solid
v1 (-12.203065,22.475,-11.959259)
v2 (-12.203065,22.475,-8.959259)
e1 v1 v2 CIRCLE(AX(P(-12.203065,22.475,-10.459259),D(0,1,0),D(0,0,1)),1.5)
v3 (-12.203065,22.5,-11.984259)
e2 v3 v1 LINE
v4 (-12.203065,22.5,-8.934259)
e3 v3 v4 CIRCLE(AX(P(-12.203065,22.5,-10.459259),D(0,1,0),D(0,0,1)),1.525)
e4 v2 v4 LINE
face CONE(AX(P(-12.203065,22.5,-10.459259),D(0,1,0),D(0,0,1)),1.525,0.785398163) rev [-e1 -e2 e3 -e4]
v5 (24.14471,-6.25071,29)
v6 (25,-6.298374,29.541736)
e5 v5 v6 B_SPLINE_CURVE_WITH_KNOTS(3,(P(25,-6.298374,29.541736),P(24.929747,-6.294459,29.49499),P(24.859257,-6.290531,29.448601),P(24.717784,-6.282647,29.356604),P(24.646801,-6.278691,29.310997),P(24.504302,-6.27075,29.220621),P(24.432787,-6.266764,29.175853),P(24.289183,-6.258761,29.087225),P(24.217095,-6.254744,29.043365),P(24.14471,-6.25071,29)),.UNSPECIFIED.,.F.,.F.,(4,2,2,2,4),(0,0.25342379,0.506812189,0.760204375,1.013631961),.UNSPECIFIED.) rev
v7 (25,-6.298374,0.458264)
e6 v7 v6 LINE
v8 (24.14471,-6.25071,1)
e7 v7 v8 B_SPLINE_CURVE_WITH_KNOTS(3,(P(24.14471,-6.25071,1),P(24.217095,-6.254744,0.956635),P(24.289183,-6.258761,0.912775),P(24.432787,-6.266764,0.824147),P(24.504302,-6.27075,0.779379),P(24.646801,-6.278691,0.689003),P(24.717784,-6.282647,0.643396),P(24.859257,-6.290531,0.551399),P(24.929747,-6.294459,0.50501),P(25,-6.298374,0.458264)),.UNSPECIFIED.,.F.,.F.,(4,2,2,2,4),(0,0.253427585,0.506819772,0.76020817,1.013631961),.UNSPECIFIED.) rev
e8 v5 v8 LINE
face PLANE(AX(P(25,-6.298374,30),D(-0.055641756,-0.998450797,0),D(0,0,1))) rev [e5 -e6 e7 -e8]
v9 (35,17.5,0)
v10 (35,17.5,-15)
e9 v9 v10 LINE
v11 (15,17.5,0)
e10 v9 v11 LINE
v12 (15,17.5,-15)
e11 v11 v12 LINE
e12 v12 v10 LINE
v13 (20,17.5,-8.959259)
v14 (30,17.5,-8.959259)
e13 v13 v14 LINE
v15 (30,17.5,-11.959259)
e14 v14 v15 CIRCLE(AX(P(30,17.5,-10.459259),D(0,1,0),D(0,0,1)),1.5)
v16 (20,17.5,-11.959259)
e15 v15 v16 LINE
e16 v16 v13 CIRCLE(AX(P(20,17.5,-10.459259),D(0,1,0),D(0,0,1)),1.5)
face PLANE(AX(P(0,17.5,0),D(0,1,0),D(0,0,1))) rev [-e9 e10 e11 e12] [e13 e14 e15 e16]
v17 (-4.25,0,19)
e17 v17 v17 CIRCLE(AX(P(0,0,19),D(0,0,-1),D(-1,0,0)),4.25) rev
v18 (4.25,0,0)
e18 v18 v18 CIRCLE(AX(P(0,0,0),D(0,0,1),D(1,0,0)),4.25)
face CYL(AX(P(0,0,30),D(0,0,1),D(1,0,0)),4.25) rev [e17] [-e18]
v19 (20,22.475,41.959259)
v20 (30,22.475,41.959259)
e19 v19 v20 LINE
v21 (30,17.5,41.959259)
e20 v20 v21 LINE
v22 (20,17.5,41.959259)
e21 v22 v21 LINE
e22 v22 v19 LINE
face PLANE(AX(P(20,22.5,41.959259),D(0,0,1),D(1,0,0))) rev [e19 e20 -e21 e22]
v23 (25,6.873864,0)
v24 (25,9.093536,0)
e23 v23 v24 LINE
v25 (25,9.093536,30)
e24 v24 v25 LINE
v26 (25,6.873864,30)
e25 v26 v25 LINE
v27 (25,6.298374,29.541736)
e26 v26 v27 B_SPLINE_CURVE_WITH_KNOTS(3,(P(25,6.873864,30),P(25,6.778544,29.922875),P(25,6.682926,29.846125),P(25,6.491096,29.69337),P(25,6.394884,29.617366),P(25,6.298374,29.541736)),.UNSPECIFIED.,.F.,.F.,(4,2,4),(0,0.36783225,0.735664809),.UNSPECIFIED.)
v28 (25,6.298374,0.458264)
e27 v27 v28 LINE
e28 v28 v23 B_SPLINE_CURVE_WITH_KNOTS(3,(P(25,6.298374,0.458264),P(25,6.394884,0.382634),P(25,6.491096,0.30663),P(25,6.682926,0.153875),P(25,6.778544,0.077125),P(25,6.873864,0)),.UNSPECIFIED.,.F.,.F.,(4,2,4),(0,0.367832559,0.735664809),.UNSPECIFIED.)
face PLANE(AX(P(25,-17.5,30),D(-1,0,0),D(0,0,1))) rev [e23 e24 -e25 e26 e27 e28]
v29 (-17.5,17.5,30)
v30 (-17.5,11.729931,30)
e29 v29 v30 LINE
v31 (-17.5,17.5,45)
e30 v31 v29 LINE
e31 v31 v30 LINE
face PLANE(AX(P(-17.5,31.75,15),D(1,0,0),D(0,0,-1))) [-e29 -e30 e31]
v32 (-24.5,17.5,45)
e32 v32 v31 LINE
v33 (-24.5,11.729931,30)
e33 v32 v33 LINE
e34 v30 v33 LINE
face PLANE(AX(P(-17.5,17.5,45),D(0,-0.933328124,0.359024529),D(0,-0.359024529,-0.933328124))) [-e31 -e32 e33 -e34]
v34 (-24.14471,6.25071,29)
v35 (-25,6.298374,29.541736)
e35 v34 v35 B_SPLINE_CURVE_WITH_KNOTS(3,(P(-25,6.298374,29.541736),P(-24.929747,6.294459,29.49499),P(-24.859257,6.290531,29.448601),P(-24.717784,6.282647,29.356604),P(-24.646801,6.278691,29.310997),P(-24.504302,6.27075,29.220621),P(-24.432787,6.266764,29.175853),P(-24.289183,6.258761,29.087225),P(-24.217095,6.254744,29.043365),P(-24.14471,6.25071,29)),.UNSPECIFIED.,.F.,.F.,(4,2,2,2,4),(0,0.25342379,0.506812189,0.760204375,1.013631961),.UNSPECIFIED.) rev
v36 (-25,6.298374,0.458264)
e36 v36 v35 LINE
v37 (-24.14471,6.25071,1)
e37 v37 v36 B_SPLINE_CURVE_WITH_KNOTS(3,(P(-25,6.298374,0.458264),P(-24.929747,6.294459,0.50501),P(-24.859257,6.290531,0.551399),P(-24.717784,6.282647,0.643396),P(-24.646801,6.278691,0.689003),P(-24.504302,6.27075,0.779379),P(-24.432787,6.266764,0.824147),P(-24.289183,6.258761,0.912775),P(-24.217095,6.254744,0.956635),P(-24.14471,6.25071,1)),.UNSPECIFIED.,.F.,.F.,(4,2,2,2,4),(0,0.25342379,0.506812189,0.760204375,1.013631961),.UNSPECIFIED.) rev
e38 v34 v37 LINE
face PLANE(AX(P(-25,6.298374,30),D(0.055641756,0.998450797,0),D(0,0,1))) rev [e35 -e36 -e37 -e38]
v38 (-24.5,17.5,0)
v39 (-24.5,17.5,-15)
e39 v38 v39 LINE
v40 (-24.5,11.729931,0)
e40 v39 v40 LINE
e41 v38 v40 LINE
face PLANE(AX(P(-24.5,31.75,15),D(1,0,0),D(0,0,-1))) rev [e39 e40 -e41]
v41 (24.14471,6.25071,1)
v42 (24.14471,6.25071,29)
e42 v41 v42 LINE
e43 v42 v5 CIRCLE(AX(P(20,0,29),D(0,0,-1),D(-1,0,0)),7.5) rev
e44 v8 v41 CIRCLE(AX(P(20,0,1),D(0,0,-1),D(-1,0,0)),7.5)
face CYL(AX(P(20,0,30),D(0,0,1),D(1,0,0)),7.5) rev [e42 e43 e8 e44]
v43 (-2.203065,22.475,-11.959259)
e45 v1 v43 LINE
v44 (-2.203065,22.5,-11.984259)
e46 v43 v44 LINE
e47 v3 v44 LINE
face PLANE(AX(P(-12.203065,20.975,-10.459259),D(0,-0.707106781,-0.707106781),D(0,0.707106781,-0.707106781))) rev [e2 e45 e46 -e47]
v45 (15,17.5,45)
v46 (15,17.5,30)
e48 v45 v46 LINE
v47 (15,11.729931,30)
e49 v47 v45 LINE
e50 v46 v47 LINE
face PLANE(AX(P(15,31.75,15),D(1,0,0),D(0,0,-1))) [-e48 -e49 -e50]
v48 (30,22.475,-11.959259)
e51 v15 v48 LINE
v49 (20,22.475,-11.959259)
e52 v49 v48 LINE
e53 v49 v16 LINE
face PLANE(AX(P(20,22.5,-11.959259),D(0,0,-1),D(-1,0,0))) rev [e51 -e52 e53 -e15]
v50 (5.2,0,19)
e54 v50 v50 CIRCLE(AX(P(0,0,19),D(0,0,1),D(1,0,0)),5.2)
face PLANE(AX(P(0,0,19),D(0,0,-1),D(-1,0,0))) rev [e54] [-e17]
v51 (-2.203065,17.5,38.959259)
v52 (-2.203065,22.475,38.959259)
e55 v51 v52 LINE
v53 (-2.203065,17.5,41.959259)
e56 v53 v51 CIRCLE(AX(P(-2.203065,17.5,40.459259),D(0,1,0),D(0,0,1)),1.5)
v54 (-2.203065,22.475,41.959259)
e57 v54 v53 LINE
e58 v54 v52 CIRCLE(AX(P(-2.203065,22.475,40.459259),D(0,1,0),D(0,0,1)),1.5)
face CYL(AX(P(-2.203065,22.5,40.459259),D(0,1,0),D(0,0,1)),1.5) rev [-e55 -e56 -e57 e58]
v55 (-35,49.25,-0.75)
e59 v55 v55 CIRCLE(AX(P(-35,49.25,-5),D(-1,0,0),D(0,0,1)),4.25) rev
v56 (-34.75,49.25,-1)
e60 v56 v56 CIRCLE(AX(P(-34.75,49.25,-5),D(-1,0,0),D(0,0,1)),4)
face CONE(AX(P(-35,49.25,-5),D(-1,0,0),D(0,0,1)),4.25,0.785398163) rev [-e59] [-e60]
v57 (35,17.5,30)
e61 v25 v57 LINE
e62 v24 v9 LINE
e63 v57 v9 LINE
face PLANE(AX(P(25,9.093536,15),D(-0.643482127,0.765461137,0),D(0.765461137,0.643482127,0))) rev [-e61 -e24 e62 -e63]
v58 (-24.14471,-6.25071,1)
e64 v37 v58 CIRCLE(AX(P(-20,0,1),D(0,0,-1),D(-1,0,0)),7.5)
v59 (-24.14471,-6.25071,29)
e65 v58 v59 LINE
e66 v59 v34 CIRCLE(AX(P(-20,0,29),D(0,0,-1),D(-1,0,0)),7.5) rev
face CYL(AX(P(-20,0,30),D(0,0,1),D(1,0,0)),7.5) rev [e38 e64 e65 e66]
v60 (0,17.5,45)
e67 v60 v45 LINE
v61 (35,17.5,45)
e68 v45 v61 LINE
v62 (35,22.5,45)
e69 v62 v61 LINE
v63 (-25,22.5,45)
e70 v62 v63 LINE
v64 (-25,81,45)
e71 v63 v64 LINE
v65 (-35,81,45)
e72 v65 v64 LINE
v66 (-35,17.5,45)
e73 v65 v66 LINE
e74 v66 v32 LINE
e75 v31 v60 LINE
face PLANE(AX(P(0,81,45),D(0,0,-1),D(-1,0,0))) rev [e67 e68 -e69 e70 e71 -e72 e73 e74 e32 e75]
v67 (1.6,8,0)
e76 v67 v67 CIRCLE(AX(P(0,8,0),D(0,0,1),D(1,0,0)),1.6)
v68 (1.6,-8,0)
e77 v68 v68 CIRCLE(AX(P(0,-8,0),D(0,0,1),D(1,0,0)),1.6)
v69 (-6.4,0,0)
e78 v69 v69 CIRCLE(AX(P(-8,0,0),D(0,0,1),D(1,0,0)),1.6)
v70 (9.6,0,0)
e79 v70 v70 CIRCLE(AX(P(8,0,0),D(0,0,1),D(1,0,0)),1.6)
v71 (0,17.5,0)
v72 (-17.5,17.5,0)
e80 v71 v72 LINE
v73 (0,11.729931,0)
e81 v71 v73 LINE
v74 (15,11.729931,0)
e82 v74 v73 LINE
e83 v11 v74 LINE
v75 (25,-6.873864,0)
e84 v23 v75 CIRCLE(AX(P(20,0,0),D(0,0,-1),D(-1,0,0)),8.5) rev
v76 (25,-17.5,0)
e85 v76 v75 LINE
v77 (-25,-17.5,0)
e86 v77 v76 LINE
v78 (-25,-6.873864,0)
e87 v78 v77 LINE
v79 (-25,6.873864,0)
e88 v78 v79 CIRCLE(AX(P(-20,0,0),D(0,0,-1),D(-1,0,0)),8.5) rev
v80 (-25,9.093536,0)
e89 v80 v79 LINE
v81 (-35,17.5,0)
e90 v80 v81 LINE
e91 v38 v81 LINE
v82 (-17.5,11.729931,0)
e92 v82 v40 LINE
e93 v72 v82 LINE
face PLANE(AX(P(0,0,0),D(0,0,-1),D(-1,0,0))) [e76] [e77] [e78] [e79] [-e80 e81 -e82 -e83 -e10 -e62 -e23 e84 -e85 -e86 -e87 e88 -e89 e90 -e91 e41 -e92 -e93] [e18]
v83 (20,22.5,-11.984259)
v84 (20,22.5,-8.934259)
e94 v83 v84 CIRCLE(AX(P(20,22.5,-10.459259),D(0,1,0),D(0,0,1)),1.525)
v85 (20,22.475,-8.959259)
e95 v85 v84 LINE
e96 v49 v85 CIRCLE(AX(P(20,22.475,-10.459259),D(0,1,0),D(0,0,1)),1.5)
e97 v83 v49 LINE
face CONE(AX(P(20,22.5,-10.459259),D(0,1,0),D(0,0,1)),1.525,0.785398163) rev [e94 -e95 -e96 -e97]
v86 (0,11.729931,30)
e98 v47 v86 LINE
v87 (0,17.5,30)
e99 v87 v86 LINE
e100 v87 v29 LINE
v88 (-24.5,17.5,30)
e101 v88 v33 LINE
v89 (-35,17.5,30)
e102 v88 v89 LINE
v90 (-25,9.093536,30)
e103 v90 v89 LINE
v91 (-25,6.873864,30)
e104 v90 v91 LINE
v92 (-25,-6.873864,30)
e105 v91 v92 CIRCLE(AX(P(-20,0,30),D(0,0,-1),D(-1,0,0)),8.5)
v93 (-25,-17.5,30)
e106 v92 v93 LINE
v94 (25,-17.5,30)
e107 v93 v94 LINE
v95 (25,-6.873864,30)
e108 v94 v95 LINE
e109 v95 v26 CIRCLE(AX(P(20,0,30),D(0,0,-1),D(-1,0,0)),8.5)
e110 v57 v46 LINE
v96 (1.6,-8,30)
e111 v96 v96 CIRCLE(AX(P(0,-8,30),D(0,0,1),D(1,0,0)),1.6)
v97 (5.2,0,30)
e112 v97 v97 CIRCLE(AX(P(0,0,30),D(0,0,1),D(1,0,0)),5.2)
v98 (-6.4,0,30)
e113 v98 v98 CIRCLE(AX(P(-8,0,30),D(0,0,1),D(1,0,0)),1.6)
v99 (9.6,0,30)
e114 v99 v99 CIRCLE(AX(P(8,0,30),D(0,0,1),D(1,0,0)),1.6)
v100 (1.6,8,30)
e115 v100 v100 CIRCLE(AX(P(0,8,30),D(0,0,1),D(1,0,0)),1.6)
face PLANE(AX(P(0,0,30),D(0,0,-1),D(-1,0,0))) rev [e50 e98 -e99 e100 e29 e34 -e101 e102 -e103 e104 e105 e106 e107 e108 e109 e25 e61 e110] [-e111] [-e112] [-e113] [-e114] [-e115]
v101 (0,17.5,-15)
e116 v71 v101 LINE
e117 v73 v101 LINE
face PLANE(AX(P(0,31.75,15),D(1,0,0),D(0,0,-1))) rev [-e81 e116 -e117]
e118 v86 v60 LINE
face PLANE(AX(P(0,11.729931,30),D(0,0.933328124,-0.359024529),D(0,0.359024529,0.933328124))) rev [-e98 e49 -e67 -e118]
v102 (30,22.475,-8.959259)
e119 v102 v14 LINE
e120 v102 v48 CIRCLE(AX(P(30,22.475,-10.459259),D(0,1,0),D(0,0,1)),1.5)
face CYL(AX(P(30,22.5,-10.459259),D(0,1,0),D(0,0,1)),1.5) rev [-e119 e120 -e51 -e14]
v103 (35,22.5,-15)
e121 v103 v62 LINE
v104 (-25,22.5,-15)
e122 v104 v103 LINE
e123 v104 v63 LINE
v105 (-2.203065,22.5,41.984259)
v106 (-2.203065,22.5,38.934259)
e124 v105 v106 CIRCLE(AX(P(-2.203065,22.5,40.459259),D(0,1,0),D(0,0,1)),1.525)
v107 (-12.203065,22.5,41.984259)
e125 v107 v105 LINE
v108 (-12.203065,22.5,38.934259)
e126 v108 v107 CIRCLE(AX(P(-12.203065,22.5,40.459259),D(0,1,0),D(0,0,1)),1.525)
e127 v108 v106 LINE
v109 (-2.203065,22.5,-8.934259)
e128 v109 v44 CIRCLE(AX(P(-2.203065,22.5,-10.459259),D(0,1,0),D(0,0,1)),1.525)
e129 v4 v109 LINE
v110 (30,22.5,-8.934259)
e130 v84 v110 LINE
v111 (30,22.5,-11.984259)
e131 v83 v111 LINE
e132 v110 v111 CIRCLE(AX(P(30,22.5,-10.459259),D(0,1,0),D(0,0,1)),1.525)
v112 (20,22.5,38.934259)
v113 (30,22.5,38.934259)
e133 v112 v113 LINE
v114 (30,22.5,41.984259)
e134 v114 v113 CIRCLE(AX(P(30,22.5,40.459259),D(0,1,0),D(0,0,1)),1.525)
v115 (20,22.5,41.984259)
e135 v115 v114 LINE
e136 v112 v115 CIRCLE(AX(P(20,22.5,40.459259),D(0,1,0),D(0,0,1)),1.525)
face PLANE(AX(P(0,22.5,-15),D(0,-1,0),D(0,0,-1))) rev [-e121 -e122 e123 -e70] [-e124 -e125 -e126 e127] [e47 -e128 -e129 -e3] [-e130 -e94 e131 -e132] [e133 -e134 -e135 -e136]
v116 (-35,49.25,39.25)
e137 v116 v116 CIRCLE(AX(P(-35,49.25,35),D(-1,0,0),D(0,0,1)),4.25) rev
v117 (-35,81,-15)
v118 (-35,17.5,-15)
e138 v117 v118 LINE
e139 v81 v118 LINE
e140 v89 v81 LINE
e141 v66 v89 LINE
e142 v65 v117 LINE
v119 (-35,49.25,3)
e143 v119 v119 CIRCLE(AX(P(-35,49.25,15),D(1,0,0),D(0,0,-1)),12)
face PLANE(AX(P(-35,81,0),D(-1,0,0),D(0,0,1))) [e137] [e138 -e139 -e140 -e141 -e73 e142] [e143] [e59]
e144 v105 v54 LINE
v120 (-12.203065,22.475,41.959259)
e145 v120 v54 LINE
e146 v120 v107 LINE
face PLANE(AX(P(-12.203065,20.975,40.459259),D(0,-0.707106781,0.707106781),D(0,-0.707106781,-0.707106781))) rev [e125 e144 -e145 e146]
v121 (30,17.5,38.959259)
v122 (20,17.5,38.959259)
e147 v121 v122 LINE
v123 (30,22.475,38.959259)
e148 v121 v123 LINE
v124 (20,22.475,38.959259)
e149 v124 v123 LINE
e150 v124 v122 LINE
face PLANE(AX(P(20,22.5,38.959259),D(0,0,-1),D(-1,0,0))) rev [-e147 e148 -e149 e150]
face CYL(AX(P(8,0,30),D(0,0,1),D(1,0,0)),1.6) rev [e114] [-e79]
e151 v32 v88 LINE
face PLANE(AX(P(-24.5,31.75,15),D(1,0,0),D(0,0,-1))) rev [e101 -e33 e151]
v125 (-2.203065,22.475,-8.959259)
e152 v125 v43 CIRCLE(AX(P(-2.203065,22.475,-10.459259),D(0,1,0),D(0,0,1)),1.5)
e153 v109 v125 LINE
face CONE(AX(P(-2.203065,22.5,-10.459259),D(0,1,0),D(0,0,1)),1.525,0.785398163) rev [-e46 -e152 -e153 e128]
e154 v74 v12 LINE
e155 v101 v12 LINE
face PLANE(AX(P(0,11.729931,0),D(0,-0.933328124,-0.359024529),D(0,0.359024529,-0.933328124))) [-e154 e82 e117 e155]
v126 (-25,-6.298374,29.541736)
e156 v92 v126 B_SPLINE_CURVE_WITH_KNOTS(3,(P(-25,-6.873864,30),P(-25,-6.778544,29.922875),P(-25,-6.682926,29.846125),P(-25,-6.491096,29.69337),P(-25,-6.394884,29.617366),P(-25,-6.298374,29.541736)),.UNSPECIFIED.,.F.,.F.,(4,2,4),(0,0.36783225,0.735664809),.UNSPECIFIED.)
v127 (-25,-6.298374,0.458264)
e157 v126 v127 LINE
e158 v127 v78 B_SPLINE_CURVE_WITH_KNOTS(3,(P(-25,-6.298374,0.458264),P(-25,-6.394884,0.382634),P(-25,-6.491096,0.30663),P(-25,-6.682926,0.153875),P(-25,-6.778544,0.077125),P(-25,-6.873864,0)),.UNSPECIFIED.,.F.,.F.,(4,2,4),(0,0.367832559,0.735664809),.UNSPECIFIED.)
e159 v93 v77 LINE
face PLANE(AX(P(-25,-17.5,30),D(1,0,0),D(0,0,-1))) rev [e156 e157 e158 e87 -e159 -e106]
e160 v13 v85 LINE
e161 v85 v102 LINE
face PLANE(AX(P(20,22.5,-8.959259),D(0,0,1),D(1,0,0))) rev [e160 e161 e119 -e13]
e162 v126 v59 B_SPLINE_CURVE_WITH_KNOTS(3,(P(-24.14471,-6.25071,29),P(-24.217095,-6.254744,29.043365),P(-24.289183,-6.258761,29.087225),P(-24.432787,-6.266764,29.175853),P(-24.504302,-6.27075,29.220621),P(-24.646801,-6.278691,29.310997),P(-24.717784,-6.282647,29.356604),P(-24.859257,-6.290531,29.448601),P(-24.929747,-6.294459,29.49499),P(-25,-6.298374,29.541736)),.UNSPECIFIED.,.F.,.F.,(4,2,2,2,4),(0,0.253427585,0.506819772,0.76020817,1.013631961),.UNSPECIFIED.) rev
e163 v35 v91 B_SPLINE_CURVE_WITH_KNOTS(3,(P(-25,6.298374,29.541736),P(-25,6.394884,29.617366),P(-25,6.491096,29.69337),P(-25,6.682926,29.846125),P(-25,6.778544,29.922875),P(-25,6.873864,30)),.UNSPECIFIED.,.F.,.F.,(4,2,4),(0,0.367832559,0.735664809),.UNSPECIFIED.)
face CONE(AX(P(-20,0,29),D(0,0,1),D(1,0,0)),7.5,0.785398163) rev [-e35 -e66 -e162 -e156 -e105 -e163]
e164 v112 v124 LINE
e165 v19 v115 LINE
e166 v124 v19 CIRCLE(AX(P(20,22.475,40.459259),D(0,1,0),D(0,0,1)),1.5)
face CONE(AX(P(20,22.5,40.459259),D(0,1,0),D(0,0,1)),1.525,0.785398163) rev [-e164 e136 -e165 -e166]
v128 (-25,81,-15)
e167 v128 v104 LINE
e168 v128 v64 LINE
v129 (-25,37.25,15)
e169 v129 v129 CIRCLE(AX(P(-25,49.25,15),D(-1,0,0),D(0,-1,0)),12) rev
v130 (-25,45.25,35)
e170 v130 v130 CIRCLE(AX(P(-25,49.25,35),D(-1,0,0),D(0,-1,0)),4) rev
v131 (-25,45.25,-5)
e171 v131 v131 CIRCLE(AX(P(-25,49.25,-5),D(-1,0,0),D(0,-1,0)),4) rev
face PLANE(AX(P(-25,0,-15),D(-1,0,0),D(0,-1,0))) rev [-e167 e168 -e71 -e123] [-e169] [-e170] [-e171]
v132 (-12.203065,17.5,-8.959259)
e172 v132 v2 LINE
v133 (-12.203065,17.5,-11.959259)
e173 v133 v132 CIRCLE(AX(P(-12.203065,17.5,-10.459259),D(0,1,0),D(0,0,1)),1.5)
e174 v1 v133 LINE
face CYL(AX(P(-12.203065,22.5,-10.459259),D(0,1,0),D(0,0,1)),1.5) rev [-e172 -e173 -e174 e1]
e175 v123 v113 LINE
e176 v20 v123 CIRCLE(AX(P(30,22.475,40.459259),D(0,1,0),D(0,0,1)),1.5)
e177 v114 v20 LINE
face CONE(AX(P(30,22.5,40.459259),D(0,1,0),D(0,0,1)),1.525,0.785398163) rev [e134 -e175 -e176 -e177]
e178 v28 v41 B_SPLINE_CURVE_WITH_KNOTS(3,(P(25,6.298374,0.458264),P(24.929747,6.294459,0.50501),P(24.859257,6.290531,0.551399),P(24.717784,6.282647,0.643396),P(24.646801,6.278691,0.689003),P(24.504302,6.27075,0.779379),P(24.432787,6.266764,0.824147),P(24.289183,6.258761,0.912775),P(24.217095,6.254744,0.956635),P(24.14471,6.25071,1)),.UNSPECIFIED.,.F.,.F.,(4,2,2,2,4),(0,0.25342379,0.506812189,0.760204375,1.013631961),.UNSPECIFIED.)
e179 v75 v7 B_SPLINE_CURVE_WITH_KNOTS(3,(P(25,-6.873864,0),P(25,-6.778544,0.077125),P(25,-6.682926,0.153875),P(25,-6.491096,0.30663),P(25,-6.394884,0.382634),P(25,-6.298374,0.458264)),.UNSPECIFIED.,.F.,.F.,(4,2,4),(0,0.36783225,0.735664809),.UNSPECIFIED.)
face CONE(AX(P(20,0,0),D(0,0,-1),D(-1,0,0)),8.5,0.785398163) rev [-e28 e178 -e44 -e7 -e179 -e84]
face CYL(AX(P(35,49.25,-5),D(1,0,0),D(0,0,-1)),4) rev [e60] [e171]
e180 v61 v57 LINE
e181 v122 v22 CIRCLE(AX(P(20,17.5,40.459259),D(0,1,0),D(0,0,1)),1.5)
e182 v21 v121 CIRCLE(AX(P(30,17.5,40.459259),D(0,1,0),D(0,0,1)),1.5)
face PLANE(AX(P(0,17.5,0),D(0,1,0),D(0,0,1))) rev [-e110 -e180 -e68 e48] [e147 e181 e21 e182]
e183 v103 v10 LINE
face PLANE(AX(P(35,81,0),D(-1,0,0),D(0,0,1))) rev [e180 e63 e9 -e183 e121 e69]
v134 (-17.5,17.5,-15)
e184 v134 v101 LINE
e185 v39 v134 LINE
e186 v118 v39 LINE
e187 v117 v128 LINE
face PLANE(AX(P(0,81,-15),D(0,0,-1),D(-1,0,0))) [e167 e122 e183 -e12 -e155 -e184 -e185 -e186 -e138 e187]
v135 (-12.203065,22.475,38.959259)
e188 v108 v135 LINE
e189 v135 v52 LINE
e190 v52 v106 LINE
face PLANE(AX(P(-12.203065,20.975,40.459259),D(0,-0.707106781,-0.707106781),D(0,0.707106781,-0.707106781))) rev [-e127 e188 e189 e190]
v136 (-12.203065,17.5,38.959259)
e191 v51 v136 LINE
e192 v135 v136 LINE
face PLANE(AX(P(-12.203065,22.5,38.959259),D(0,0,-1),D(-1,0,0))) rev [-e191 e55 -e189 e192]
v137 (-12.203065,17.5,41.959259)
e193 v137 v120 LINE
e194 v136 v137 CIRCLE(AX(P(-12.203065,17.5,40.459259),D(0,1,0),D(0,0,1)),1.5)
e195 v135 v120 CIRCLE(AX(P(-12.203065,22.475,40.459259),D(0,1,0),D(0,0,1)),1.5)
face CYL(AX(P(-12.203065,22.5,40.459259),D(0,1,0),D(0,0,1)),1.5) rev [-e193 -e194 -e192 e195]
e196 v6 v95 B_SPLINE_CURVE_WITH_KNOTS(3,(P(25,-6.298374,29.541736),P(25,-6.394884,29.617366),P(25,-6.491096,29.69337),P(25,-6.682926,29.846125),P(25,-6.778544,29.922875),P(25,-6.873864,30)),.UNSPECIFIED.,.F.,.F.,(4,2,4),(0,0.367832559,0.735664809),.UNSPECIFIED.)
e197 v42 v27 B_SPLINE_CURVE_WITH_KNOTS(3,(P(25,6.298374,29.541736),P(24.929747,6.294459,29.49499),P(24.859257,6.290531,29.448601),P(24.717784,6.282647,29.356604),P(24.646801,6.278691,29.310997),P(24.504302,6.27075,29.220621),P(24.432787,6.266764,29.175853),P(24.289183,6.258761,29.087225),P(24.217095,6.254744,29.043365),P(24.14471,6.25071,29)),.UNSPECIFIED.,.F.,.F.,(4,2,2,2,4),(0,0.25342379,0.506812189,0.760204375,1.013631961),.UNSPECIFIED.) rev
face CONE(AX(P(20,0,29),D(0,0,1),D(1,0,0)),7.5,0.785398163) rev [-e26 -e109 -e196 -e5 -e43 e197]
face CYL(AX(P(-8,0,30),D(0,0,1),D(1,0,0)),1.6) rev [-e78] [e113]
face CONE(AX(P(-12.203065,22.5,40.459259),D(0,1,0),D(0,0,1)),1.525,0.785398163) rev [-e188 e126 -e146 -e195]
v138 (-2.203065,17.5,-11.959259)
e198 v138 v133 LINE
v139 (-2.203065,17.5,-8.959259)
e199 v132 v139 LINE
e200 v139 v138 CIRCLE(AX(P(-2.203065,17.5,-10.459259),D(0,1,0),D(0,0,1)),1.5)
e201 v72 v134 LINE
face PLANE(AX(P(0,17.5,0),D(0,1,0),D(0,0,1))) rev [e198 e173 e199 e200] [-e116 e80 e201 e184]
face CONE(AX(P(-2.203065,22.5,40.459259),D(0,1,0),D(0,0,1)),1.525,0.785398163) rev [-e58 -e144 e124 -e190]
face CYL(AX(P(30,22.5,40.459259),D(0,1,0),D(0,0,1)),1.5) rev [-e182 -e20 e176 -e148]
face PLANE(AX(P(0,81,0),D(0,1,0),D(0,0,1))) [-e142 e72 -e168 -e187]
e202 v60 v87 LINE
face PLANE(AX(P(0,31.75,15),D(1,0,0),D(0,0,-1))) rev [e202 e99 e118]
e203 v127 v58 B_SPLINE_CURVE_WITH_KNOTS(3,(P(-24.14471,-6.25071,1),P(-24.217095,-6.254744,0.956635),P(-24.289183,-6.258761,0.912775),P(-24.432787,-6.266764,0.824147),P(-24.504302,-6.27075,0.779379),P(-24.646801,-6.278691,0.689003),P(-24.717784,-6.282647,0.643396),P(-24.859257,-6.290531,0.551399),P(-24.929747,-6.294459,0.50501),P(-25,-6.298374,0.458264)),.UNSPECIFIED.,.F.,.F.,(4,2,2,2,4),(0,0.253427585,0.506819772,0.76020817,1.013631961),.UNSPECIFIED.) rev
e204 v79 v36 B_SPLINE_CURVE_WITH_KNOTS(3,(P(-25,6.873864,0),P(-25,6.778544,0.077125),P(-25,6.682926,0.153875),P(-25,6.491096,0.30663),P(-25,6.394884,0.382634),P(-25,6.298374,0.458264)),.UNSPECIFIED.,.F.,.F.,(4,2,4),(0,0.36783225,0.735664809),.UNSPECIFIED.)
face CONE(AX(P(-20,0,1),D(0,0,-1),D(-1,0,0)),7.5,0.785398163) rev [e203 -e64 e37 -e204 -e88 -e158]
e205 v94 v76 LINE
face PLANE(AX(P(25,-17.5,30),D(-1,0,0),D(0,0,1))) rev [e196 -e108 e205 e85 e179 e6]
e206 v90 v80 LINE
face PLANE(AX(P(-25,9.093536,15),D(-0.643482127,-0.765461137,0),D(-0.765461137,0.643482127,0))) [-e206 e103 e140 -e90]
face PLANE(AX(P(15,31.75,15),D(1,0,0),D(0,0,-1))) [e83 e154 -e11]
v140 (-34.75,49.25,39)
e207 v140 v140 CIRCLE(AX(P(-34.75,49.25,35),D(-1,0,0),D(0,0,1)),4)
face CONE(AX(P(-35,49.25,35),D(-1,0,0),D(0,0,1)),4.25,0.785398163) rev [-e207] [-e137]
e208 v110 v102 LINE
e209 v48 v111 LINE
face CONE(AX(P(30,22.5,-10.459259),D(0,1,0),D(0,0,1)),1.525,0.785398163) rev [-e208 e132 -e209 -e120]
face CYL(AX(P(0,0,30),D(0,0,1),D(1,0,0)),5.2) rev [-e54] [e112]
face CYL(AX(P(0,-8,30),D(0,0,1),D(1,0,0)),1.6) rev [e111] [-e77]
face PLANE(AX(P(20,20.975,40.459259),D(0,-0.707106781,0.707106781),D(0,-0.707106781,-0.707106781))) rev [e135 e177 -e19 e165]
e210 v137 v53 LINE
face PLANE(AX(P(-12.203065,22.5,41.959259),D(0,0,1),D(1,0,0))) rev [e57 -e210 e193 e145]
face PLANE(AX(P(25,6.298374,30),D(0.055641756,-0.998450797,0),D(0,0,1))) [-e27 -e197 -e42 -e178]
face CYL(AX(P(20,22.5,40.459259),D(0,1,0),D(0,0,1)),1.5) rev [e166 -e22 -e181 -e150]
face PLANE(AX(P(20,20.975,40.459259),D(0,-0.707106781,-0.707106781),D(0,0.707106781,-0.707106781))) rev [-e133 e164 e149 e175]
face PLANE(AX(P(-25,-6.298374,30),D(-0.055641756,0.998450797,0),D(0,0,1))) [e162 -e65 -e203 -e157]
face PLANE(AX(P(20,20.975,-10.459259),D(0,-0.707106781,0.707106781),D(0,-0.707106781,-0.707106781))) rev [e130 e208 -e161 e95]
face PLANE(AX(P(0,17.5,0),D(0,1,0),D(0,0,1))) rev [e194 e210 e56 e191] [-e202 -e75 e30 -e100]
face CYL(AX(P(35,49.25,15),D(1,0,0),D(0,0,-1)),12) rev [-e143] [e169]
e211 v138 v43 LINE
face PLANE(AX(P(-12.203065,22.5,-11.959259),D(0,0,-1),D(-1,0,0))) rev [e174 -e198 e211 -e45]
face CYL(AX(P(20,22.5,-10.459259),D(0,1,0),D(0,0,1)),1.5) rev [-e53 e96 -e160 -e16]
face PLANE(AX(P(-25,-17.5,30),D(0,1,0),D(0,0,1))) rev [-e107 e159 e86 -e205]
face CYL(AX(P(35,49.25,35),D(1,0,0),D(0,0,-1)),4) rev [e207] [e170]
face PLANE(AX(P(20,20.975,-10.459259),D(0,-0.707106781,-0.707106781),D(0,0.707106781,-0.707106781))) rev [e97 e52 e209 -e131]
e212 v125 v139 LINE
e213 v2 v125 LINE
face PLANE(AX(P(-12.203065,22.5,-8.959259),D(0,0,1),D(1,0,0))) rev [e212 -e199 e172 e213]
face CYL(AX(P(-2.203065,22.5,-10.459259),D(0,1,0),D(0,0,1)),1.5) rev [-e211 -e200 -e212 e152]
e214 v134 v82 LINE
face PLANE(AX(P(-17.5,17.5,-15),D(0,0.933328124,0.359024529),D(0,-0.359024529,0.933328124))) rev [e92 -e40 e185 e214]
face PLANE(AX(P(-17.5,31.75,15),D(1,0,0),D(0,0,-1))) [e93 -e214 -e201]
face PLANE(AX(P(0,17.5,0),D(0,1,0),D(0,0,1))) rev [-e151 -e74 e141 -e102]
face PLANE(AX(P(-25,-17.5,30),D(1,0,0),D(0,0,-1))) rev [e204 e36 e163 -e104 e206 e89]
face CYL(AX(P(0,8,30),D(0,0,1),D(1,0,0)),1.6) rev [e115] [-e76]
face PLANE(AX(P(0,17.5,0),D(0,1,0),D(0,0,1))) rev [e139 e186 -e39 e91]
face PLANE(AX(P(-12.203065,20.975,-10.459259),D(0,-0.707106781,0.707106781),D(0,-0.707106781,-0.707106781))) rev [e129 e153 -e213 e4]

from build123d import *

# Parameters (mm, degrees)
SKETCH_1_W               = 50
SKETCH_1_H               = 35
EXTRUDE_1_DEPTH          = 30
HOLE_WIZARD_363_D        = 8.5
HOLE_WIZARD_468_D        = 3.2
HOLE_WIZARD_622_D        = 15
CHAMFER_1_SIZE           = 1
CHAMFER_1_SIZE_2         = 0.708203932
SKETCH_8_W               = 70
SKETCH_8_H               = 60
SKETCH_8_W_2             = 50
SKETCH_8_H_2             = 30
EXTRUDE_2_DEPTH          = 63.5
HOLE_WIZARD_1_D          = 24
HOLE_WIZARD_2_D          = 8
CHAMFER_2_SIZE           = 0.25
CUT_EXTRUDE_2_DEPTH      = 107.705201373
CUT_EXTRUDE_2_DEPTH_BACK = 107.705201373
SKETCH_14_W              = 60
SKETCH_14_H              = 58.5
MM_START                 = 17
MM_2_DEPTH               = 5.5
RIB_1_REACH              = 95.199
SKETCH_25_WALL_W         = 201.46144539
SKETCH_25_WALL_H         = 30
RIB_2_REACH              = 101.05
SKETCH_26_WALL_W         = 216.17250262
SKETCH_26_WALL_H         = 15
RIB_4_REACH              = 108.5
SKETCH_27_WALL_W         = 231.071518272
SKETCH_27_WALL_H         = 7
HOLE_WIZARD_3_D          = 10.4
HOLE_WIZARD_3_DEPTH      = 11


with BuildPart() as part:
    # 草图1 → 凸台-拉伸1 (new body)
    with BuildSketch(Plane.XY):
        Rectangle(SKETCH_1_W, SKETCH_1_H)
    extrude(amount=EXTRUDE_1_DEPTH)

    # Hole Wizard 363 (through all)
    with Locations(Plane.XY.offset(30)):
        with Locations((0, 0)):
            Hole(HOLE_WIZARD_363_D / 2)

    # Hole Wizard 468 (through all)
    with Locations(Plane.XY.offset(30)):
        with Locations((8, 0), (0, 8), (-8, 0), (0, -8)):
            Hole(HOLE_WIZARD_468_D / 2)

    # Hole Wizard 622 (through all)
    with Locations(Plane.XY.offset(30)):
        with Locations((20, 0), (-20, 0)):
            Hole(HOLE_WIZARD_622_D / 2)

    # 倒角1
    # the kernel refuses this chamfer: 1, 0.708203932 mm, written as the material it takes off along each edge
    with BuildSketch(Plane(origin=(-20, 0, 0), x_dir=(-0.8790200859122482, 0.4767847402789059, 0), z_dir=(-0.4767847402789059, -0.8790200859122482, 0))) as chamfer_1_piece_1:
        Polygon((7.5, -CHAMFER_1_SIZE), (7.5 + CHAMFER_1_SIZE, 0), (7.5, 0), align=None)
    revolve(axis=Axis((-20, 0, 0), (0, 0, -1)), revolution_arc=303.048763938, mode=Mode.SUBTRACT)
    with BuildSketch(Plane(origin=(-20, 0, 30), x_dir=(-0.879020085912248, 0.47678474027890627, 0), z_dir=(-0.47678474027890627, -0.879020085912248, 0))) as chamfer_1_piece_2:
        Polygon((7.5 + CHAMFER_1_SIZE, 0), (7.5, CHAMFER_1_SIZE), (7.5, 0), align=None)
    revolve(axis=Axis((-20, 0, 30), (0, 0, -1)), revolution_arc=303.048763938, mode=Mode.SUBTRACT)
    with BuildSketch(Plane(origin=(20, 0, 30), x_dir=(0.879020085912248, -0.4767847402789061, 0), z_dir=(0.4767847402789061, 0.879020085912248, 0))) as chamfer_1_piece_3:
        Polygon((7.5 + CHAMFER_1_SIZE, 0), (7.5, CHAMFER_1_SIZE), (7.5, 0), align=None)
    revolve(axis=Axis((20, 0, 30), (0, 0, -1)), revolution_arc=303.048763938, mode=Mode.SUBTRACT)
    with BuildSketch(Plane(origin=(20, 0, 0), x_dir=(0.8790200859122481, 0.476784740278906, 0), z_dir=(0.476784740278906, -0.8790200859122481, 0))) as chamfer_1_piece_4:
        Polygon((7.5, CHAMFER_1_SIZE), (7.5 + CHAMFER_1_SIZE, 0), (7.5, 0), align=None)
    revolve(axis=Axis((20, 0, 0), (0, 0, 1)), revolution_arc=303.048763938, mode=Mode.SUBTRACT)
    with BuildSketch(Plane(origin=(-25, 5.590169944, 32.778051389), x_dir=(0.7914486393779661, 0.611235675682274, 0), z_dir=(0, 0, -1)), Plane(origin=(25, -5.590169944, 32.778051389), x_dir=(-0.7914486393779661, -0.611235675682274, 0), z_dir=(0, 0, -1))) as chamfer_1_piece_5:
        with BuildLine():
            Line((1.080663788, 0), (CHAMFER_1_SIZE_2 * 0.611235676113, -CHAMFER_1_SIZE_2 * 0.791448639936))
            Line((CHAMFER_1_SIZE_2 * 0.611235676113, -CHAMFER_1_SIZE_2 * 0.791448639936), (0, 0))
            ThreePointArc((0, 0), (0.555522087, -0.019473843), (1.080663788, 0))
        make_face()
    extrude(amount=35.556102778, mode=Mode.SUBTRACT)
    with BuildSketch(Plane(origin=(-25, -5.590169944, 32.778051389), x_dir=(0.7914486393779665, -0.6112356756822735, 0), z_dir=(0, 0, -1))) as chamfer_1_piece_6:
        with BuildLine():
            Line((1.080663788, 0), (CHAMFER_1_SIZE_2 * 0.611235676113, CHAMFER_1_SIZE_2 * 0.791448639936))
            Line((CHAMFER_1_SIZE_2 * 0.611235676113, CHAMFER_1_SIZE_2 * 0.791448639936), (0, 0))
            ThreePointArc((0, 0), (0.555522087, 0.019473843), (1.080663788, 0))
        make_face()
    extrude(amount=35.556102778, mode=Mode.SUBTRACT)
    with BuildSketch(Plane(origin=(25, 5.590169944, 32.778051389), x_dir=(0, 1, 0), z_dir=(0, 0, -1))) as chamfer_1_piece_7:
        with BuildLine():
            Line((CHAMFER_1_SIZE_2, 0), (0.660540261, -0.855289885))
            ThreePointArc((0.660540261, -0.855289885), (0.354967464, -0.427764092), (0, 0))
            Line((0, 0), (CHAMFER_1_SIZE_2, 0))
        make_face()
    extrude(amount=35.556102778, mode=Mode.SUBTRACT)

    # 草图8 → 凸台-拉伸2 (add)
    # profile 1 of 5: a face of its own
    with BuildSketch(Plane(origin=(0, 17.5, 0), x_dir=(1, 0, 0), z_dir=(0, 1, 0))):
        with Locations((0, -15)):
            Rectangle(SKETCH_8_W, SKETCH_8_H)
        with Locations((0, -15)):
            Rectangle(SKETCH_8_W_2, SKETCH_8_H_2, mode=Mode.SUBTRACT)
    # profile 2 of 5: a face of its own
    with BuildSketch(Plane(origin=(0, 17.5, 0), x_dir=(1, 0, 0), z_dir=(0, 1, 0))):
        Polygon((25, 0), (0, -15), (25, -30), align=None)
    # profile 3 of 5: a face of its own
    with BuildSketch(Plane(origin=(0, 17.5, 0), x_dir=(1, 0, 0), z_dir=(0, 1, 0))):
        Polygon((25, -30), (0, -15), (-25, -30), align=None)
    # profile 4 of 5: a face of its own
    with BuildSketch(Plane(origin=(0, 17.5, 0), x_dir=(1, 0, 0), z_dir=(0, 1, 0))):
        Polygon((0, -15), (-25, 0), (-25, -30), align=None)
    # profile 5 of 5: a face of its own
    with BuildSketch(Plane(origin=(0, 17.5, 0), x_dir=(1, 0, 0), z_dir=(0, 1, 0))):
        Polygon((25, 0), (-25, 0), (0, -15), align=None)
    extrude(amount=EXTRUDE_2_DEPTH)

    # 孔1 (through all)
    with Locations(Plane(origin=(35, 0, 0), x_dir=(0, 0, -1), z_dir=(1, 0, 0))):
        with Locations((-15, 49.25)):
            Hole(HOLE_WIZARD_1_D / 2)

    # 孔2 (through all)
    with Locations(Plane(origin=(35, 0, 0), x_dir=(0, 0, -1), z_dir=(1, 0, 0))):
        with Locations((5, 49.25), (-35, 49.25)):
            Hole(HOLE_WIZARD_2_D / 2)

    # 倒角2
    chamfer_2_edges = [part.edges().sort_by_distance(p)[0] for p in [
        (-35, 49.25, 31),
        (-35, 49.25, -9),
    ]]
    chamfer(chamfer_2_edges, length=CHAMFER_2_SIZE)

    # 草图14 → 切除-拉伸2 (cut, two sides: drawn at the far end of the back side and taken through both)
    with BuildSketch(Plane.XY.offset(45).offset(-CUT_EXTRUDE_2_DEPTH_BACK)):
        with Locations((5, 51.75)):
            Rectangle(SKETCH_14_W, SKETCH_14_H)
    extrude(amount=CUT_EXTRUDE_2_DEPTH + CUT_EXTRUDE_2_DEPTH_BACK, mode=Mode.SUBTRACT)

    # 大小mm 暗销槽口2: read off the stored shape, not the designer's step
    # 大小mm 暗销槽口2 outline → 大小mm 暗销槽口2 (cut)
    with BuildSketch(Plane(origin=(0, 0, 0), x_dir=(1, 0, 0), z_dir=(0, 1, 0)).offset(MM_START)):
        with BuildLine():
            Line((30, 11.959259259), (20, 11.959259259))
            ThreePointArc((20, 11.959259259), (18.5, 10.459259259), (20, 8.959259259))
            Line((20, 8.959259259), (30, 8.959259259))
            ThreePointArc((30, 8.959259259), (31.5, 10.459259259), (30, 11.959259259))
        make_face()
        with BuildLine():
            ThreePointArc((-12.203065134, 11.959259259), (-13.703065134, 10.459259259), (-12.203065134, 8.959259259))
            Line((-12.203065134, 8.959259259), (-2.203065134, 8.959259259))
            ThreePointArc((-2.203065134, 8.959259259), (-0.703065134, 10.459259259), (-2.203065134, 11.959259259))
            Line((-2.203065134, 11.959259259), (-12.203065134, 11.959259259))
        make_face()
    mm_2 = extrude(amount=MM_2_DEPTH, mode=Mode.SUBTRACT)

    # mm _2 2: loft between two sections, ruled curve by curve
    mm_2_2_from = [
        Edge.make_three_point_arc((30, 22.475, -8.959259259), (31.060660172, 22.475, -9.398599087), (31.5, 22.475, -10.459259259)),
        Edge.make_three_point_arc((31.5, 22.475, -10.459259259), (31.060660172, 22.475, -11.519919431), (30, 22.475, -11.959259259)),
        Edge.make_three_point_arc((20, 22.475, -11.959259259), (18.939339828, 22.475, -11.519919431), (18.5, 22.475, -10.459259259)),
        Edge.make_three_point_arc((18.5, 22.475, -10.459259259), (18.939339828, 22.475, -9.398599087), (20, 22.475, -8.959259259)),
        Edge.make_line((30, 22.475, -11.959259259), (20, 22.475, -11.959259259)),
        Edge.make_line((30, 22.475, -8.959259259), (20, 22.475, -8.959259259)),
    ]
    mm_2_2_to = [
        Edge.make_three_point_arc((30, 22.5, -8.934259259), (31.078337841, 22.5, -9.380921418), (31.525, 22.5, -10.459259259)),
        Edge.make_three_point_arc((31.525, 22.5, -10.459259259), (31.078337841, 22.5, -11.537597101), (30, 22.5, -11.984259259)),
        Edge.make_three_point_arc((20, 22.5, -11.984259259), (18.921662159, 22.5, -11.537597101), (18.475, 22.5, -10.459259259)),
        Edge.make_three_point_arc((18.475, 22.5, -10.459259259), (18.921662159, 22.5, -9.380921418), (20, 22.5, -8.934259259)),
        Edge.make_line((30, 22.5, -11.984259259), (20, 22.5, -11.984259259)),
        Edge.make_line((30, 22.5, -8.934259259), (20, 22.5, -8.934259259)),
    ]
    mm_2_2 = Solid(Shell([*[Face.make_surface_from_curves(mm_2_2_from[k], mm_2_2_to[k]) for k in range(6)], Face(Wire(mm_2_2_from)), Face(Wire(mm_2_2_to))]))
    add(mm_2_2, mode=Mode.SUBTRACT)

    # mm _2 3: loft between two sections, ruled curve by curve
    mm_2_3_from = [
        Edge.make_three_point_arc((-2.203065134, 22.475, -8.959259259), (-1.142404962, 22.475, -9.398599087), (-0.703065134, 22.475, -10.459259259)),
        Edge.make_three_point_arc((-0.703065134, 22.475, -10.459259259), (-1.142404962, 22.475, -11.519919431), (-2.203065134, 22.475, -11.959259259)),
        Edge.make_three_point_arc((-12.203065134, 22.475, -11.959259259), (-13.263725306, 22.475, -11.519919431), (-13.703065134, 22.475, -10.459259259)),
        Edge.make_three_point_arc((-13.703065134, 22.475, -10.459259259), (-13.263725306, 22.475, -9.398599087), (-12.203065134, 22.475, -8.959259259)),
        Edge.make_line((-2.203065134, 22.475, -11.959259259), (-12.203065134, 22.475, -11.959259259)),
        Edge.make_line((-2.203065134, 22.475, -8.959259259), (-12.203065134, 22.475, -8.959259259)),
    ]
    mm_2_3_to = [
        Edge.make_three_point_arc((-2.203065134, 22.5, -8.934259259), (-1.124727293, 22.5, -9.380921418), (-0.678065134, 22.5, -10.459259259)),
        Edge.make_three_point_arc((-0.678065134, 22.5, -10.459259259), (-1.124727293, 22.5, -11.537597101), (-2.203065134, 22.5, -11.984259259)),
        Edge.make_three_point_arc((-12.203065134, 22.5, -11.984259259), (-13.281402975, 22.5, -11.537597101), (-13.728065134, 22.5, -10.459259259)),
        Edge.make_three_point_arc((-13.728065134, 22.5, -10.459259259), (-13.281402975, 22.5, -9.380921418), (-12.203065134, 22.5, -8.934259259)),
        Edge.make_line((-2.203065134, 22.5, -11.984259259), (-12.203065134, 22.5, -11.984259259)),
        Edge.make_line((-2.203065134, 22.5, -8.934259259), (-12.203065134, 22.5, -8.934259259)),
    ]
    mm_2_3 = Solid(Shell([*[Face.make_surface_from_curves(mm_2_3_from[k], mm_2_3_to[k]) for k in range(6)], Face(Wire(mm_2_3_from)), Face(Wire(mm_2_3_to))]))
    add(mm_2_3, mode=Mode.SUBTRACT)

    # 镜向1: 大小mm 暗销槽口2, mm _2 2, mm _2 3 across plane
    add(mm_2.mirror(Plane(origin=(0, 0, 15), x_dir=(1, 0, 0), z_dir=(0, 0, -1))), mode=Mode.SUBTRACT)
    add(mm_2_2.mirror(Plane(origin=(0, 0, 15), x_dir=(1, 0, 0), z_dir=(0, 0, -1))), mode=Mode.SUBTRACT)
    add(mm_2_3.mirror(Plane(origin=(0, 0, 15), x_dir=(1, 0, 0), z_dir=(0, 0, -1))), mode=Mode.SUBTRACT)

    # 草图25 wall → 筋1 (add, up to next)
    with BuildSketch(Plane(origin=(-30, 13.296768148, 15), x_dir=(-0.765461137236, 0.6434821267, 0), z_dir=(0.6434821267, 0.765461137236, 0)), mode=Mode.PRIVATE) as rib_1_sk1:
        Rectangle(SKETCH_25_WALL_W, SKETCH_25_WALL_H)
    rib_1_tool1 = extrude(rib_1_sk1.sketch, amount=RIB_1_REACH, mode=Mode.PRIVATE) - part.part
    rib_1 = rib_1_tool1.solids().sort_by_distance((-30, 13.296768148, 15))[0]
    add(rib_1)

    # 镜向2: 筋1 across plane
    add(rib_1.mirror(Plane(origin=(0, 0, 0), x_dir=(0, 0, 1), z_dir=(1, 0, 0))))

    # 草图26 wall → 筋2 (add, up to next)
    with BuildSketch(Plane(origin=(0, 14.614965359, 37.5), x_dir=(0, 0.359024529342, 0.933328124151), z_dir=(0, -0.933328124151, 0.359024529342)), mode=Mode.PRIVATE) as rib_2_sk1:
        with Locations((0, -7.5)):
            Rectangle(SKETCH_26_WALL_W, SKETCH_26_WALL_H)
    rib_2_tool1 = extrude(rib_2_sk1.sketch, amount=-RIB_2_REACH, mode=Mode.PRIVATE) - part.part
    rib_2 = rib_2_tool1.solids().sort_by_distance((0, 14.614965359, 37.5))[0]
    add(rib_2)

    # 草图27 wall → 筋4 (add, up to next)
    with BuildSketch(Plane(origin=(-17.5, 14.614965359, 37.5), x_dir=(0, -0.359024529342, -0.933328124151), z_dir=(0, 0.933328124151, -0.359024529342)), mode=Mode.PRIVATE) as rib_4_sk1:
        with Locations((0, 3.5)):
            Rectangle(SKETCH_27_WALL_W, SKETCH_27_WALL_H)
    rib_4_tool1 = extrude(rib_4_sk1.sketch, amount=RIB_4_REACH, mode=Mode.PRIVATE) - part.part
    rib_4 = rib_4_tool1.solids().sort_by_distance((-17.5, 14.614965359, 37.5))[0]
    add(rib_4)

    # 镜向4: 筋2, 筋4 across plane
    add(rib_2.mirror(Plane(origin=(0, 0, 15), x_dir=(1, 0, 0), z_dir=(0, 0, -1))))
    add(rib_4.mirror(Plane(origin=(0, 0, 15), x_dir=(1, 0, 0), z_dir=(0, 0, -1))))

    # 孔3
    with Locations(Plane.XY.offset(30)):
        with Locations((0, 0)):
            Hole(HOLE_WIZARD_3_D / 2, depth=HOLE_WIZARD_3_DEPTH)


solid = part.part
